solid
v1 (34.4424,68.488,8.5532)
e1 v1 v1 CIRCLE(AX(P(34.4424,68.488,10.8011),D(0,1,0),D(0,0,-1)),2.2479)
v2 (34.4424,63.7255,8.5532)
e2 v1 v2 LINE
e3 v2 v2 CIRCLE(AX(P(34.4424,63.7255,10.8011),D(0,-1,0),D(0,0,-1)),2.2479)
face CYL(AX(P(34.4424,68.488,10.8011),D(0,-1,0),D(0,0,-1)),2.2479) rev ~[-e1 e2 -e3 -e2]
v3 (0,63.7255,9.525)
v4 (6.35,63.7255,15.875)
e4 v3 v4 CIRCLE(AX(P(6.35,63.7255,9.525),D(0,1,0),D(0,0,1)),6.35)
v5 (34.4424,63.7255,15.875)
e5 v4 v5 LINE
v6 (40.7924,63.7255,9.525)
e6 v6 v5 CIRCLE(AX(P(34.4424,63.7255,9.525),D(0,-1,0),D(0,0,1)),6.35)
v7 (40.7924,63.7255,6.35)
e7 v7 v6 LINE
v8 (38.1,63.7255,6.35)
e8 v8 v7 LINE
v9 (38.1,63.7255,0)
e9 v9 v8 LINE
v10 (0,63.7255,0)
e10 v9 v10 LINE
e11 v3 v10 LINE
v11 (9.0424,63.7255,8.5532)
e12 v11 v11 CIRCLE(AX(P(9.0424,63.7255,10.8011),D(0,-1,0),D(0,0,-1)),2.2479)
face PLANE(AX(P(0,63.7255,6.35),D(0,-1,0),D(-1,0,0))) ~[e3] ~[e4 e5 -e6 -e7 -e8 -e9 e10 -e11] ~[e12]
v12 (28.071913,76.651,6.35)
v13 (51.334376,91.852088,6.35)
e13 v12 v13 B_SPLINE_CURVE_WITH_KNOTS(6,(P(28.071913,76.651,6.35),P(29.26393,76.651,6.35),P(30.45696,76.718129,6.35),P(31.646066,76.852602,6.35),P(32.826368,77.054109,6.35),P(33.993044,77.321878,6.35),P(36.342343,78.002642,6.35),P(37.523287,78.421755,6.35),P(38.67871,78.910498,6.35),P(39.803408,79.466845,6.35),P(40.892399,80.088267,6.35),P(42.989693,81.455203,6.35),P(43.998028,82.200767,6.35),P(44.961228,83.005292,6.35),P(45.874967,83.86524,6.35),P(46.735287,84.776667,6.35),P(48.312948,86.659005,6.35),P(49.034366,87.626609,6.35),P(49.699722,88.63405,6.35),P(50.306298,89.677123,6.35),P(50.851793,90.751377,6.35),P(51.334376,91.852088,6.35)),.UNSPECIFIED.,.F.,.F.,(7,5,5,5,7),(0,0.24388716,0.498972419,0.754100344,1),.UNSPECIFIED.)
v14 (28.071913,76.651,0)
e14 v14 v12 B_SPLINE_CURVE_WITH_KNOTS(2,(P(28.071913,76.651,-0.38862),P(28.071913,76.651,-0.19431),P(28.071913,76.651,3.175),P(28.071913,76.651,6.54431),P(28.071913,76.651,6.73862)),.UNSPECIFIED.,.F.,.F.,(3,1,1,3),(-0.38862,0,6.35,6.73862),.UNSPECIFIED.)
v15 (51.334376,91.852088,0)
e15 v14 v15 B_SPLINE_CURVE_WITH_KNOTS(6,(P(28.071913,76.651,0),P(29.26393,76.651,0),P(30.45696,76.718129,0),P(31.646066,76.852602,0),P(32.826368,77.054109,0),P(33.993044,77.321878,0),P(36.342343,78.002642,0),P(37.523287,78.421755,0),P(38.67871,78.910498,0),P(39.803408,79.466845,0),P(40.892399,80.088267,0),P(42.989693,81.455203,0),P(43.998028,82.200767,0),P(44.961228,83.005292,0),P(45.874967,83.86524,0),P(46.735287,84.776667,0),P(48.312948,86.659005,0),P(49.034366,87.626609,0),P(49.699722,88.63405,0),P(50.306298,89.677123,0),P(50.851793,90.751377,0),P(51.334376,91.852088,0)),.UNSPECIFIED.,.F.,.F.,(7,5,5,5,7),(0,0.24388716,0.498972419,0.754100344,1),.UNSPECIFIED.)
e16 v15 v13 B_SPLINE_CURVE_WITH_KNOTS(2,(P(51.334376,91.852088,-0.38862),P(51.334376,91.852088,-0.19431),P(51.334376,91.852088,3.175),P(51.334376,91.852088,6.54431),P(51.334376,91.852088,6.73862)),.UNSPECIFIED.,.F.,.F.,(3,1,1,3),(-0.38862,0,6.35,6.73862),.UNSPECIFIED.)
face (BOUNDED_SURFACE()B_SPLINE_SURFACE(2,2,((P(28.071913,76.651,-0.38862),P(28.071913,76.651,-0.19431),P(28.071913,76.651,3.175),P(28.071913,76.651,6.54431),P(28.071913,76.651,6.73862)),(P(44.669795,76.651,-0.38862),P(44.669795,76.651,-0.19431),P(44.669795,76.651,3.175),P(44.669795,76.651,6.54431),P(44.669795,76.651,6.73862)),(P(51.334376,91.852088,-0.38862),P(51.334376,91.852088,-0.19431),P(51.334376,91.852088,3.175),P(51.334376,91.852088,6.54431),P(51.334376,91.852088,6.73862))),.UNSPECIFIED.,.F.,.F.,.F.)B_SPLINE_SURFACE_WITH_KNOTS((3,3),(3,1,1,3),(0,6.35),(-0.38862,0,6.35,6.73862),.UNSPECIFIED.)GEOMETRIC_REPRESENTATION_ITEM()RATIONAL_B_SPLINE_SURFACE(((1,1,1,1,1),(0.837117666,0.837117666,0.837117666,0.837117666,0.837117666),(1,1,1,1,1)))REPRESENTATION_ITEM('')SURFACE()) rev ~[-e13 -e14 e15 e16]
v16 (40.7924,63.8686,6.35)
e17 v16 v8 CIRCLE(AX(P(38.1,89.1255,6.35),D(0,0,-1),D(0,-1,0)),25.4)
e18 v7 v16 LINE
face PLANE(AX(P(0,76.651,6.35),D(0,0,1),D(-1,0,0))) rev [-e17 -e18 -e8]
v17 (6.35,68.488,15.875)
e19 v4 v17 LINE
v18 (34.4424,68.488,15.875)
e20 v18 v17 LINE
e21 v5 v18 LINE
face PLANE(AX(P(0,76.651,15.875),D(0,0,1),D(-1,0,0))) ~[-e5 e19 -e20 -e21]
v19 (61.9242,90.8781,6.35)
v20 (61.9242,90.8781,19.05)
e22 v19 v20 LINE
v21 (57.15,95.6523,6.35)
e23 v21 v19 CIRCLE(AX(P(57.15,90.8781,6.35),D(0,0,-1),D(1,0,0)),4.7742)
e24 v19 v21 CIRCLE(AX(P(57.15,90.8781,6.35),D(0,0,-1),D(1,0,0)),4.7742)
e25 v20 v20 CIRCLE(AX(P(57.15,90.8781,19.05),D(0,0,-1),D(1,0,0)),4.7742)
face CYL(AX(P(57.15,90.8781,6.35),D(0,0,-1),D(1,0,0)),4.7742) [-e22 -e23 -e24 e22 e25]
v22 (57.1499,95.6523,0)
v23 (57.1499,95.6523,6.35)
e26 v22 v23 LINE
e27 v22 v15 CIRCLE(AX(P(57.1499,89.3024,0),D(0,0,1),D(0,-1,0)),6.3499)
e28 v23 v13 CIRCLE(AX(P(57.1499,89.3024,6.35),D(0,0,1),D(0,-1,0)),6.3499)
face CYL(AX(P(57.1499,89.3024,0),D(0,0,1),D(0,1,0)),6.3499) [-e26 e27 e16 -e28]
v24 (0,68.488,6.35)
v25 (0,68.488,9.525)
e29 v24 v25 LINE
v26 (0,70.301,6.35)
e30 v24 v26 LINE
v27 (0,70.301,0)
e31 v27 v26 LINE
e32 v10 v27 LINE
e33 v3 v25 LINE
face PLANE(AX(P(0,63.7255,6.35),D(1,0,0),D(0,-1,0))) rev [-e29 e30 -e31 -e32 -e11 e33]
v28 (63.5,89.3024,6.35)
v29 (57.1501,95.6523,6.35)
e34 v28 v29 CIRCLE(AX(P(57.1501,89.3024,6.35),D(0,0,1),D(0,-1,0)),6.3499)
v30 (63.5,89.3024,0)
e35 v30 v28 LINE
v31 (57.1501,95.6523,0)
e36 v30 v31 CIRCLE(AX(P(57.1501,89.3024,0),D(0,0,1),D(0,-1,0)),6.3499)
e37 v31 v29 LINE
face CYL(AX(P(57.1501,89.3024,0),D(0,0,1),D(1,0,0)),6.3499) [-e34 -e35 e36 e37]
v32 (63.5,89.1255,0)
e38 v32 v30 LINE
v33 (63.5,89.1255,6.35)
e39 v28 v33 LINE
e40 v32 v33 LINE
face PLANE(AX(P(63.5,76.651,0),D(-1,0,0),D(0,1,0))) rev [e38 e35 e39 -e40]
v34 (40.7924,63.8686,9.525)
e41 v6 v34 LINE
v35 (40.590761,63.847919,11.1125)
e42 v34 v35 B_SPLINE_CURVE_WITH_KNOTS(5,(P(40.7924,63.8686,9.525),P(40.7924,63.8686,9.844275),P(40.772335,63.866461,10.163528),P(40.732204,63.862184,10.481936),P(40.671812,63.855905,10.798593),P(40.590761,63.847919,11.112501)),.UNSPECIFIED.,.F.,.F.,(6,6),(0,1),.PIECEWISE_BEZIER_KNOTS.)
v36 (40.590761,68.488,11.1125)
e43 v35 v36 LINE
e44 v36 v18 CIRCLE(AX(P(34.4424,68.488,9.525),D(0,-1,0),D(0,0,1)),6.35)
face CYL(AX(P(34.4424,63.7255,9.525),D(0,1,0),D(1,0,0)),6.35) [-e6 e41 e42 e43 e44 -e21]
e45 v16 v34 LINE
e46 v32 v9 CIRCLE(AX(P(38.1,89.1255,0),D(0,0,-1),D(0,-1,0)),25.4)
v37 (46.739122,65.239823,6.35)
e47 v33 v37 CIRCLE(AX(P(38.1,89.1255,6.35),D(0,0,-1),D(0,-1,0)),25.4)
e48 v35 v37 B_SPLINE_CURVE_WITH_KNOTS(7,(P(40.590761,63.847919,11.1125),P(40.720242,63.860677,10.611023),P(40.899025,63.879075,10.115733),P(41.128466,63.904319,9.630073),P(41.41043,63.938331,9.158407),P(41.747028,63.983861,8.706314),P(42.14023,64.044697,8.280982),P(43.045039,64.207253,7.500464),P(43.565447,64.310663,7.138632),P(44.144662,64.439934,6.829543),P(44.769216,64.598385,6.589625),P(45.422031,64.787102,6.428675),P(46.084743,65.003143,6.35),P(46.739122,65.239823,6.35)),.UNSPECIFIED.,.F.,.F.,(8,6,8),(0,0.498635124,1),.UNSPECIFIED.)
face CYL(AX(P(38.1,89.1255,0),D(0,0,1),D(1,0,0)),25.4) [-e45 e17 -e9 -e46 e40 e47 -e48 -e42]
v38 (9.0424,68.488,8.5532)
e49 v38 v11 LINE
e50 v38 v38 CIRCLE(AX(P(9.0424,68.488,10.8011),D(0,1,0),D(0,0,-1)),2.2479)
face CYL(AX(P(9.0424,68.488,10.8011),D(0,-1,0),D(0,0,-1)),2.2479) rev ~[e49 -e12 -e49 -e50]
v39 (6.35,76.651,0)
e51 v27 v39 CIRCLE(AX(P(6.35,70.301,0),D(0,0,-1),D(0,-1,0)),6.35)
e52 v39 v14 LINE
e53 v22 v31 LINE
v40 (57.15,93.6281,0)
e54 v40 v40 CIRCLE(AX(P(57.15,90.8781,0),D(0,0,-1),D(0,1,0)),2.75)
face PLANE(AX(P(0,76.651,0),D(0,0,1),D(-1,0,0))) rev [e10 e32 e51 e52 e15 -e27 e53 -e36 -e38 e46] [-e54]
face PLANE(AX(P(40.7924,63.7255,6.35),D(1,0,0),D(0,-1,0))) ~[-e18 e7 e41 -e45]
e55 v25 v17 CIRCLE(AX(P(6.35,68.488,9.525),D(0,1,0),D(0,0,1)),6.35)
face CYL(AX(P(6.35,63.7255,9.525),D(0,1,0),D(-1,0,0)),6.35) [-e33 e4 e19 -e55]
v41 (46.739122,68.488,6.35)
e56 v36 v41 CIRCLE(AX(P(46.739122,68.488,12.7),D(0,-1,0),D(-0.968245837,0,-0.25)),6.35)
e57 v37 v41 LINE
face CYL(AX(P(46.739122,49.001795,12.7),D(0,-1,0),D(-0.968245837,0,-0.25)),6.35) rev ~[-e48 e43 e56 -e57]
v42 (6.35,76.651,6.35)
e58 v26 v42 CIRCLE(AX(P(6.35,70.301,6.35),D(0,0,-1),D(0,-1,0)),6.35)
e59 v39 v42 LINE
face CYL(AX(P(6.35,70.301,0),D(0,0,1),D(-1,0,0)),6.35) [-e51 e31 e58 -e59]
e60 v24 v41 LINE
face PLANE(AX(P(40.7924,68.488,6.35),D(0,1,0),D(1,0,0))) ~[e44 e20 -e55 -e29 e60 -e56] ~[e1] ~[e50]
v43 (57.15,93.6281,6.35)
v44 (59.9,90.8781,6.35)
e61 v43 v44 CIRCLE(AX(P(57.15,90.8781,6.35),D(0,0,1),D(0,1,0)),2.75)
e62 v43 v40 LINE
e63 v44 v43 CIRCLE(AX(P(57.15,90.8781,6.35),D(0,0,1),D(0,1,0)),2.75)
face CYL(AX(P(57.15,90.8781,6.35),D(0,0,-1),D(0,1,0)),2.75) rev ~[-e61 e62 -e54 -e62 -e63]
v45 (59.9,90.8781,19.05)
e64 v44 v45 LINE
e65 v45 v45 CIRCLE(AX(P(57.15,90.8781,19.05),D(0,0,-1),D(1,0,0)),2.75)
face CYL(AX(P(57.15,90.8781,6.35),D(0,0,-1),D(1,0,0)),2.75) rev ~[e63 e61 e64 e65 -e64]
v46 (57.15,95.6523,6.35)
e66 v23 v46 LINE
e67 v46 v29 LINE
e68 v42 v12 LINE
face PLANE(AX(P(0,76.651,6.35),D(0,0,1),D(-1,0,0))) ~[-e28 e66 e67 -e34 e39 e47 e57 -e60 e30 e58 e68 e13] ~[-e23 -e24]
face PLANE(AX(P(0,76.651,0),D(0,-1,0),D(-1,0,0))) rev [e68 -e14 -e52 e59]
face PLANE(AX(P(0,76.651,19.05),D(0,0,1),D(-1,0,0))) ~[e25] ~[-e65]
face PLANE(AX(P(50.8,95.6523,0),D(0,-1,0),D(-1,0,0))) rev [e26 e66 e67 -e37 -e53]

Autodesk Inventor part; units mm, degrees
ref_plane "YZ Plane" through (0, 0, 0) normal (1, 0, 0) x (0, 1, 0)
ref_plane "XZ Plane" through (0, 0, 0) normal (0, 1, 0) x (-1, 0, 0)
sketch "Sketch1" plane through (0, 0, 0) normal (0, 0, 1) x (1, 0, 0)
  line L0 (0, 0) -> (63.5, 0)
  line L1 (63.5, 0) -> (63.5, 12.9255)
  line L2 (63.5, 12.9255) -> (0, 12.9255)
  line L3 (0, 12.9255) -> (0, 0)
  line L4 (63.5, 12.9255) -> (50.8, 12.9255)
  line L5 (50.8, 12.9255) -> (50.8, -19.0013)
  line L6 (50.8, -19.0013) -> (63.5, -19.0013)
  line L7 (63.5, -19.0013) -> (63.5, 12.9255)
  point P0 (57.15, -14.2271)
  point P1 (34.4424, 12.9255)
  point P2 (9.0424, 12.9255)
  dimension "d0" = 63.5
  dimension "d2" = 22.7076
  dimension "d3" = 25.4
  dimension "d4" = 27.1526
  dimension "d5" = 0
  dimension "d6" = 6.35
  dimension "d7" = 6.35
extrude "Extrusion1" add sketch "Sketch1" along normal blind 6.35
sketch "Sketch2" plane through (0, 0, 6.35) normal (0, 0, 1) x (1, 0, 0)
  line L0 (63.5, -19.0013) -> (63.5, 12.9255) projected
  line L1 (50.8, 0) -> (50.8, -19.0013) projected
  line L2 (63.5, 12.9255) -> (0, 12.9255) projected
  point P0 (0, 0)
  point P1 (57.15, -14.2271)
  dimension "d10" = 6.35
  dimension "d11" = 6.35
  dimension "d12" = 27.1526
hole "Hole1" at (57.15, -14.2271, 6.35) direction (0, 0, -1) diameter 5.5 depth 25.4 tip angle 118
sketch "Sketch3" plane through (0, 0, 6.35) normal (0, 0, 1) x (1, 0, 0)
  circle A0 centre (57.15, -14.2271) radius 2.75 projected
  circle A1 centre (57.15, -14.2271) radius 4.7742
  line L0 (50.8, -19.0013) -> (63.5, -19.0013) projected
  point P0 (0, 0)
extrude "Extrusion2" add sketch "Sketch3" along normal blind 12.7
fillet "Fillet1" radius 6.35 2 edges at (63.5, -19.0013, 3.175) (50.8, -19.0013, 3.175)
fillet "Fillet2" radius 25.4 2 edges at (50.8, 0, 3.175) (63.5, 12.9255, 3.175)
sketch "Sketch4" plane through (0, 0, 6.35) normal (0, 0, 1) x (1, 0, 0)
  line L0 (0, 12.9255) -> (0, 0) projected
  line L1 (0, 12.9255) -> (40.7924, 12.9255)
  line L2 (40.7924, 12.9255) -> (40.7924, 8.163)
  line L3 (40.7924, 8.163) -> (0, 8.163)
  line L4 (0, 8.163) -> (0, 12.9255)
  circle A0 centre (57.15, -14.2271) radius 2.75 projected
  dimension "d24" = 16.3576
  dimension "d25" = 4.7625
extrude "Extrusion3" add sketch "Sketch4" along normal blind 9.525 contours L1 L2 L3 L0
fillet "Fillet3" radius 6.35 2 edges at (40.7924, 10.5443, 15.875) (0, 10.5443, 15.875)
fillet "Fillet4" radius 6.35 1 edges at (40.7924, 10.4727, 6.35)
sketch "Sketch5" plane through (6.35, 8.163, 15.875) normal (0, -1, 0) x (1, 0, 0)
  line L0 (48.05, 3.175) -> (53.55, 3.175) projected
  point P0 (-6.35, -15.875)
  point P1 (2.6924, -5.0739)
  point P2 (28.0924, -5.0739)
  point P3 (50.8, 3.175)
  dimension "d30" = 25.4
  dimension "d31" = 22.7076
hole "Hole2" at (9.0424, 8.163, 10.8011) at (34.4424, 8.163, 10.8011) at (57.15, 8.163, 19.05) direction (0, 1, 0) diameter 4.4958 depth 25.4 tip angle 118 clearance for "Flat Head Machine Screw (82)" size "#8" standard "Ansi Unified Screw Threads"
fillet "Fillet5" radius 6.35 1 edges at (0, 0, 3.175)
ref_plane "Work Plane1" through (0, 38.3255, 0) normal (0, 1, 0) x (1, 0, 0)
mirror "Mirror1" about plane through (0, 38.3255, 0) normal (0, 1, 0) of "Extrusion3", "Fillet4", "Fillet5", "Hole2", "Fillet3", "Fillet2", "Fillet1", "Extrusion2", "Hole1", "Extrusion1"
sketch "Sketch6" plane through (0, 12.9255, 0) normal (0, 1, 0) x (1, 0, 0)
  line L0 (75.6078, -32.1869) -> (-9.353, -32.1869)
  line L1 (-9.353, -32.1869) -> (-9.353, 6.0612)
  line L2 (-9.353, 6.0612) -> (75.6078, 6.0612)
  line L3 (75.6078, 6.0612) -> (75.6078, -32.1869)
  point P0 (0, 0)
extrude "Extrusion4" cut sketch "Sketch6" against normal blind 101.6
properties part number "supporty2"
